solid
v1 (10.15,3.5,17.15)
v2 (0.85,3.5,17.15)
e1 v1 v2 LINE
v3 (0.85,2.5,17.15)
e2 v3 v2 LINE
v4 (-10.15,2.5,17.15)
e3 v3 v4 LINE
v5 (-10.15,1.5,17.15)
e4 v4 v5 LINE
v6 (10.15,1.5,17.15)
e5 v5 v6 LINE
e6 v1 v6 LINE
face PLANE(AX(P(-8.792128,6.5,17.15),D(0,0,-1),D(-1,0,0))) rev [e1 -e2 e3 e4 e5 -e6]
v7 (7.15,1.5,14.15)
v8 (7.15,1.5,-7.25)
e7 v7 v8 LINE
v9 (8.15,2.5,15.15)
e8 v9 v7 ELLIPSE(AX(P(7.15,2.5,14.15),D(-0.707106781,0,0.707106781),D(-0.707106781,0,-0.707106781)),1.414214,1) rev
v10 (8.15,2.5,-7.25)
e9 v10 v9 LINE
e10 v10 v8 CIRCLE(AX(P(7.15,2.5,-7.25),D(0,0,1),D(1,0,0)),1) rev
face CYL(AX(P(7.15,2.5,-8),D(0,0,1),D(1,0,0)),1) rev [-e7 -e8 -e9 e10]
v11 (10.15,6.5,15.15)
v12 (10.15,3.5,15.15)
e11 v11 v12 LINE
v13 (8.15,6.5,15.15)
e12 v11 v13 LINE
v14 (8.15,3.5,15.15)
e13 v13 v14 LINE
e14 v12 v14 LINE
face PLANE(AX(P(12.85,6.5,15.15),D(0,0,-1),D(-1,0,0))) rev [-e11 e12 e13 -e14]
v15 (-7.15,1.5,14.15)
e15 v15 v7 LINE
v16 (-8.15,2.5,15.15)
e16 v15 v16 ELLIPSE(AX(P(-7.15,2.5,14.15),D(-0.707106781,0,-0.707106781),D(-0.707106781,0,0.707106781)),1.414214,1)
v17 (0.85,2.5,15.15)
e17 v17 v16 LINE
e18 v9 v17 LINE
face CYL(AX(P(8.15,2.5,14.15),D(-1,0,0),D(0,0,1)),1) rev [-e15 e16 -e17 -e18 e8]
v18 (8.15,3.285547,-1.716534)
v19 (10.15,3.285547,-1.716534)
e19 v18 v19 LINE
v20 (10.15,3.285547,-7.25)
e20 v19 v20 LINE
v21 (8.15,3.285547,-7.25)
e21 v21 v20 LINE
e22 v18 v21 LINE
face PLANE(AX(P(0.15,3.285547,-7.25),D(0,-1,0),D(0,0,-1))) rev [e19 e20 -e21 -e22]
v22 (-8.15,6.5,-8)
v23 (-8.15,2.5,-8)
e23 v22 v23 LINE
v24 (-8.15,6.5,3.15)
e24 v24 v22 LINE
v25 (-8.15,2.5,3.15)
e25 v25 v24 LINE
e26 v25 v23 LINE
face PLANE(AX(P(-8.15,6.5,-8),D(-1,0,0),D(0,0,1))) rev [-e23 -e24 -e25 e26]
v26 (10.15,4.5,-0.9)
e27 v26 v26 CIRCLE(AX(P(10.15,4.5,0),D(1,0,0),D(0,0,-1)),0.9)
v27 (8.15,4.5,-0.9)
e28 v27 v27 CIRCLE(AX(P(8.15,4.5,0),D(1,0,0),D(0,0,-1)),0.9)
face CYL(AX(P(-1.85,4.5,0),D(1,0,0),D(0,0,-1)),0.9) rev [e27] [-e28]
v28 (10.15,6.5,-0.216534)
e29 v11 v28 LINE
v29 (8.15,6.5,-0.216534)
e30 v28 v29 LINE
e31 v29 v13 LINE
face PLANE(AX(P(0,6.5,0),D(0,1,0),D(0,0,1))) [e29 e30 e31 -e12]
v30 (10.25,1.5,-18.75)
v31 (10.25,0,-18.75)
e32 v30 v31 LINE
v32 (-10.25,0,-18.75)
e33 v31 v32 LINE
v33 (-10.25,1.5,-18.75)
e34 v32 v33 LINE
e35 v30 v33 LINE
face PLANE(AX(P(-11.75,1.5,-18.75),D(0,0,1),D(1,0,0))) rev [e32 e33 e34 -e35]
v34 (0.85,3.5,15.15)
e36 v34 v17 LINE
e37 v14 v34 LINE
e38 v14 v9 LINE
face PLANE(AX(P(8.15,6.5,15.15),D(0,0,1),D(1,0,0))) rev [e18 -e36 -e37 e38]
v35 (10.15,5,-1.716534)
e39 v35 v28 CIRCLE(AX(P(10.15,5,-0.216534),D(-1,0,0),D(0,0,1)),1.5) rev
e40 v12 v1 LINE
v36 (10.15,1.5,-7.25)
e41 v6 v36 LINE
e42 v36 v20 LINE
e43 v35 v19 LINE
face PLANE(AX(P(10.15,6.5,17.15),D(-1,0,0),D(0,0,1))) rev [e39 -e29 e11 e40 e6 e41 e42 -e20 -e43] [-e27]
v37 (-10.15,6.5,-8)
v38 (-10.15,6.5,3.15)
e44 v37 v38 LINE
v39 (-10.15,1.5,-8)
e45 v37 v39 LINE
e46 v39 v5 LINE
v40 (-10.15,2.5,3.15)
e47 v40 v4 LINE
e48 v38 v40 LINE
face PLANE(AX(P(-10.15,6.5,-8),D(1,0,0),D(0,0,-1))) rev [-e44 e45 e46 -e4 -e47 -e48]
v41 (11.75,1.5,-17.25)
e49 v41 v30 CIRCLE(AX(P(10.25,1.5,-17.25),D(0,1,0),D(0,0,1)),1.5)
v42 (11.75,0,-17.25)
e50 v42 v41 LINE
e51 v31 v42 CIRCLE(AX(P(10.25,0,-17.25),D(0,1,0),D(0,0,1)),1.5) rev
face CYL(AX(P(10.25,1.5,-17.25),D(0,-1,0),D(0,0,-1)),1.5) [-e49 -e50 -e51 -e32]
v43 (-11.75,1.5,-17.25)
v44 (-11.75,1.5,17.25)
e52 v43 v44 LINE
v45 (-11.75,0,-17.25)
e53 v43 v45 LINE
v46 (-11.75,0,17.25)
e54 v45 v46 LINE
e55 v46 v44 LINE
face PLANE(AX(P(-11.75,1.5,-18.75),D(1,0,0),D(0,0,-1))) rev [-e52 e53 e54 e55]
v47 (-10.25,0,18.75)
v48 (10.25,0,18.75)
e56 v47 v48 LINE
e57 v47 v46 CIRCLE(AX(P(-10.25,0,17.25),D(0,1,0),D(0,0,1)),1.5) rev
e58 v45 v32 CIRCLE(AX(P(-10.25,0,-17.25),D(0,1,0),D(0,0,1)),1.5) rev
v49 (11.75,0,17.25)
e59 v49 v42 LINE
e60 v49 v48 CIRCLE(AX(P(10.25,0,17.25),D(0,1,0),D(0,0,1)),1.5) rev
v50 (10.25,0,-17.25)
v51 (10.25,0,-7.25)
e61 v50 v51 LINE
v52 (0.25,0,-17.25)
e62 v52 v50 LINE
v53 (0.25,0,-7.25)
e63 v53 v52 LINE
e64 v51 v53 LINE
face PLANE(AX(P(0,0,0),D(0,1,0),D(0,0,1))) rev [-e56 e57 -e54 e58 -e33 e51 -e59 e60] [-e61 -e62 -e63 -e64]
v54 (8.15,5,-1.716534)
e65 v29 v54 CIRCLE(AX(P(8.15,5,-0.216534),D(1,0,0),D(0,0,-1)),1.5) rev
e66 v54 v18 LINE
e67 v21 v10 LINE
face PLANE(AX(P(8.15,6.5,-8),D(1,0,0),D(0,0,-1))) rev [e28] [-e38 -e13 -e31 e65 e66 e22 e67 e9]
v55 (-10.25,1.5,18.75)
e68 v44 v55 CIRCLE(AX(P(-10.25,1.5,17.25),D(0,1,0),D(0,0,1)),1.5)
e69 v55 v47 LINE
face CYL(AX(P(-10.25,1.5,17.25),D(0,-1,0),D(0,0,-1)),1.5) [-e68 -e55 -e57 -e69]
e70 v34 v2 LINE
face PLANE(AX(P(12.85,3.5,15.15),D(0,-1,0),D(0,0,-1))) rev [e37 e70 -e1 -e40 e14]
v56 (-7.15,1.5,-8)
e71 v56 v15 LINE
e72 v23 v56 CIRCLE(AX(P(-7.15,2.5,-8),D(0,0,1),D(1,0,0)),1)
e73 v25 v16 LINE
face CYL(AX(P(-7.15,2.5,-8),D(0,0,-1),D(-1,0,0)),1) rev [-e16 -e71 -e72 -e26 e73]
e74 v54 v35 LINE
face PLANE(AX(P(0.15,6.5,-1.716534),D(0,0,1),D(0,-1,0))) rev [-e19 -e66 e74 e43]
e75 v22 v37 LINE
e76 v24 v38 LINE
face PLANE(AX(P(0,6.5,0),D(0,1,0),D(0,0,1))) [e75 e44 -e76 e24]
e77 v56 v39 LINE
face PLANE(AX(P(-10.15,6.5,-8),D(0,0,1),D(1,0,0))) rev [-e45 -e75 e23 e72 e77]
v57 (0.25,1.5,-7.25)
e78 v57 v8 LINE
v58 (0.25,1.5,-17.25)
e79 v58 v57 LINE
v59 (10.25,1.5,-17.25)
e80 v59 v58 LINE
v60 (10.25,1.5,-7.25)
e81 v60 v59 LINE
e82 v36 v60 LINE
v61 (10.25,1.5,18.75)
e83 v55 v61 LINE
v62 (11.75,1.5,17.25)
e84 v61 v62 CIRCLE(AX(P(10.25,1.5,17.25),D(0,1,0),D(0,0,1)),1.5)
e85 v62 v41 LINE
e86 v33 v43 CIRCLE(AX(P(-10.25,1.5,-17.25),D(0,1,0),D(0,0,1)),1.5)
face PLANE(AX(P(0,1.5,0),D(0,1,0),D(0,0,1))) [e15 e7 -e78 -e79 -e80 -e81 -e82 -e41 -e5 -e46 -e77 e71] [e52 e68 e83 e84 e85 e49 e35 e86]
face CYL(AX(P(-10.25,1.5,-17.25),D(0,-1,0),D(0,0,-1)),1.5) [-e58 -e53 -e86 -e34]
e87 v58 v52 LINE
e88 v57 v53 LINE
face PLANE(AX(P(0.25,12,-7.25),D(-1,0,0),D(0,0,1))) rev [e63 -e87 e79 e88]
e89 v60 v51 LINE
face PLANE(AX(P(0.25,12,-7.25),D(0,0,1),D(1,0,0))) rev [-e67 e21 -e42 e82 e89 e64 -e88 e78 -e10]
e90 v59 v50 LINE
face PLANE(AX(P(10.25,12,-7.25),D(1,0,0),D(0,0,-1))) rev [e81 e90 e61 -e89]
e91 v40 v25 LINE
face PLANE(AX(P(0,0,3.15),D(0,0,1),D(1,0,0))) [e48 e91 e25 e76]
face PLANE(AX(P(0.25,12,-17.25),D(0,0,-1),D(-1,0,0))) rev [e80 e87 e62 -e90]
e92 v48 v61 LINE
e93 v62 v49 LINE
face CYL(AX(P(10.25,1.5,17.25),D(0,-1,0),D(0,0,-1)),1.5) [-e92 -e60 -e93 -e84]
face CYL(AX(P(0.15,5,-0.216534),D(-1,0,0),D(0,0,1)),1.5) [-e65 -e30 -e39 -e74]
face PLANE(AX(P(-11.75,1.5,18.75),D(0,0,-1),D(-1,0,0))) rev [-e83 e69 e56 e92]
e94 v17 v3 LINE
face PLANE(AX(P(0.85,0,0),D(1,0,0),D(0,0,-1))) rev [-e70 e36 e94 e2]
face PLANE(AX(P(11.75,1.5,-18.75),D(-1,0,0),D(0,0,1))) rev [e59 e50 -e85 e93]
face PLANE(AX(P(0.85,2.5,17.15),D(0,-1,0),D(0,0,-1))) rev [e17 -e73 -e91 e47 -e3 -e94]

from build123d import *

# Parameters (mm, degrees)
SKETCH_1_W          = 23.5
SKETCH_1_H          = 37.5
EXTRUDE_1_DEPTH     = 1.5
FILLET_1_R          = 1.5
EXTRUDE_2_DEPTH     = 5
SKETCH_3_W          = 2
SKETCH_3_H          = 4
CUT_EXTRUDE_1_DEPTH = 11
SKETCH_4_W          = 2
SKETCH_4_H          = 4
CUT_EXTRUDE_2_DEPTH = 12
SKETCH_5_W          = 2
SKETCH_5_H          = 3
CUT_EXTRUDE_3_DEPTH = 12
FILLET_2_R          = 1
SKETCH_6_R          = 0.9
CUT_EXTRUDE_4_DEPTH = 12
SKETCH_7_W          = 10
SKETCH_7_H          = 10
CUT_EXTRUDE_5_DEPTH = 12
SKETCH_8_W          = 5.533466027
SKETCH_8_H          = 3.21445342
CUT_EXTRUDE_6_DEPTH = 10
FILLET_3_R          = 1.5


with BuildPart() as part:
    # 草图1 → 凸台-拉伸1 (new body)
    with BuildSketch(Plane(origin=(0, 0, 0), x_dir=(1, 0, 0), z_dir=(0, 1, 0))):
        Rectangle(SKETCH_1_W, SKETCH_1_H)
    extrude(amount=EXTRUDE_1_DEPTH)

    # 圆角1
    fillet_1_edges = [part.edges().sort_by_distance(p)[0] for p in [
        (-11.75, 0.75, -18.75),
        (11.75, 0.75, -18.75),
        (11.75, 0.75, 18.75),
        (-11.75, 0.75, 18.75),
    ]]
    fillet(fillet_1_edges, radius=FILLET_1_R)

    # 草图2 → 凸台-拉伸2 (add)
    with BuildSketch(Plane(origin=(0, 1.5, 0), x_dir=(1, 0, 0), z_dir=(0, 1, 0))):
        Polygon((-8.792128206, -17.15), (10.15, -17.15), (10.15, 8), (8.15, 8), (8.15, -15.15), (-8.15, -15.15), (-8.15, 8), (-10.15, 8), (-10.15, -17.15), align=None)
    extrude(amount=EXTRUDE_2_DEPTH)

    # 草图3 → 切除-拉伸1 (cut)
    with BuildSketch(Plane.ZY.offset(10.15)):
        with Locations((16.15, 4.5)):
            Rectangle(SKETCH_3_W, SKETCH_3_H)
    extrude(amount=-CUT_EXTRUDE_1_DEPTH, mode=Mode.SUBTRACT)

    # 草图4 → 切除-拉伸2 (cut)
    with BuildSketch(Plane.XY.offset(15.15)):
        with Locations((-9.15, 4.5)):
            Rectangle(SKETCH_4_W, SKETCH_4_H)
    extrude(amount=-CUT_EXTRUDE_2_DEPTH, mode=Mode.SUBTRACT)

    # 草图5 → 切除-拉伸3 (cut)
    with BuildSketch(Plane.ZY.offset(-0.85)):
        with Locations((16.15, 5)):
            Rectangle(SKETCH_5_W, SKETCH_5_H)
    extrude(amount=-CUT_EXTRUDE_3_DEPTH, mode=Mode.SUBTRACT)

    # 圆角2
    fillet_2_edges = [part.edges().sort_by_distance(p)[0] for p in [
        (0, 1.5, 15.15),
        (-8.15, 1.5, 3.575),
        (8.15, 1.5, 3.575),
    ]]
    fillet(fillet_2_edges, radius=FILLET_2_R - 0.0001)  # a hair under: the kernel refuses the full size

    # 草图6 → 切除-拉伸4 (cut)
    with BuildSketch(Plane(origin=(10.15, 0, 0), x_dir=(0, 0, -1), z_dir=(1, 0, 0))):
        with Locations((0, 4.5)):
            Circle(SKETCH_6_R)
    extrude(amount=-CUT_EXTRUDE_4_DEPTH, mode=Mode.SUBTRACT)

    # 草图7 → 切除-拉伸5 (cut)
    with BuildSketch(Plane.XZ):
        with Locations((5.25, -12.25)):
            Rectangle(SKETCH_7_W, SKETCH_7_H)
    extrude(amount=-CUT_EXTRUDE_5_DEPTH, mode=Mode.SUBTRACT)

    # 草图8 → 切除-拉伸6 (cut)
    with BuildSketch(Plane(origin=(10.15, 0, 0), x_dir=(0, 0, -1), z_dir=(1, 0, 0))):
        with Locations((4.483266987, 4.89277329)):
            Rectangle(SKETCH_8_W, SKETCH_8_H)
    extrude(amount=-CUT_EXTRUDE_6_DEPTH, mode=Mode.SUBTRACT)

    # 圆角3
    fillet_3_edges = [part.edges().sort_by_distance(p)[0] for p in [
        (9.15, 6.5, -1.716533973),
    ]]
    fillet(fillet_3_edges, radius=FILLET_3_R)


solid = part.part
